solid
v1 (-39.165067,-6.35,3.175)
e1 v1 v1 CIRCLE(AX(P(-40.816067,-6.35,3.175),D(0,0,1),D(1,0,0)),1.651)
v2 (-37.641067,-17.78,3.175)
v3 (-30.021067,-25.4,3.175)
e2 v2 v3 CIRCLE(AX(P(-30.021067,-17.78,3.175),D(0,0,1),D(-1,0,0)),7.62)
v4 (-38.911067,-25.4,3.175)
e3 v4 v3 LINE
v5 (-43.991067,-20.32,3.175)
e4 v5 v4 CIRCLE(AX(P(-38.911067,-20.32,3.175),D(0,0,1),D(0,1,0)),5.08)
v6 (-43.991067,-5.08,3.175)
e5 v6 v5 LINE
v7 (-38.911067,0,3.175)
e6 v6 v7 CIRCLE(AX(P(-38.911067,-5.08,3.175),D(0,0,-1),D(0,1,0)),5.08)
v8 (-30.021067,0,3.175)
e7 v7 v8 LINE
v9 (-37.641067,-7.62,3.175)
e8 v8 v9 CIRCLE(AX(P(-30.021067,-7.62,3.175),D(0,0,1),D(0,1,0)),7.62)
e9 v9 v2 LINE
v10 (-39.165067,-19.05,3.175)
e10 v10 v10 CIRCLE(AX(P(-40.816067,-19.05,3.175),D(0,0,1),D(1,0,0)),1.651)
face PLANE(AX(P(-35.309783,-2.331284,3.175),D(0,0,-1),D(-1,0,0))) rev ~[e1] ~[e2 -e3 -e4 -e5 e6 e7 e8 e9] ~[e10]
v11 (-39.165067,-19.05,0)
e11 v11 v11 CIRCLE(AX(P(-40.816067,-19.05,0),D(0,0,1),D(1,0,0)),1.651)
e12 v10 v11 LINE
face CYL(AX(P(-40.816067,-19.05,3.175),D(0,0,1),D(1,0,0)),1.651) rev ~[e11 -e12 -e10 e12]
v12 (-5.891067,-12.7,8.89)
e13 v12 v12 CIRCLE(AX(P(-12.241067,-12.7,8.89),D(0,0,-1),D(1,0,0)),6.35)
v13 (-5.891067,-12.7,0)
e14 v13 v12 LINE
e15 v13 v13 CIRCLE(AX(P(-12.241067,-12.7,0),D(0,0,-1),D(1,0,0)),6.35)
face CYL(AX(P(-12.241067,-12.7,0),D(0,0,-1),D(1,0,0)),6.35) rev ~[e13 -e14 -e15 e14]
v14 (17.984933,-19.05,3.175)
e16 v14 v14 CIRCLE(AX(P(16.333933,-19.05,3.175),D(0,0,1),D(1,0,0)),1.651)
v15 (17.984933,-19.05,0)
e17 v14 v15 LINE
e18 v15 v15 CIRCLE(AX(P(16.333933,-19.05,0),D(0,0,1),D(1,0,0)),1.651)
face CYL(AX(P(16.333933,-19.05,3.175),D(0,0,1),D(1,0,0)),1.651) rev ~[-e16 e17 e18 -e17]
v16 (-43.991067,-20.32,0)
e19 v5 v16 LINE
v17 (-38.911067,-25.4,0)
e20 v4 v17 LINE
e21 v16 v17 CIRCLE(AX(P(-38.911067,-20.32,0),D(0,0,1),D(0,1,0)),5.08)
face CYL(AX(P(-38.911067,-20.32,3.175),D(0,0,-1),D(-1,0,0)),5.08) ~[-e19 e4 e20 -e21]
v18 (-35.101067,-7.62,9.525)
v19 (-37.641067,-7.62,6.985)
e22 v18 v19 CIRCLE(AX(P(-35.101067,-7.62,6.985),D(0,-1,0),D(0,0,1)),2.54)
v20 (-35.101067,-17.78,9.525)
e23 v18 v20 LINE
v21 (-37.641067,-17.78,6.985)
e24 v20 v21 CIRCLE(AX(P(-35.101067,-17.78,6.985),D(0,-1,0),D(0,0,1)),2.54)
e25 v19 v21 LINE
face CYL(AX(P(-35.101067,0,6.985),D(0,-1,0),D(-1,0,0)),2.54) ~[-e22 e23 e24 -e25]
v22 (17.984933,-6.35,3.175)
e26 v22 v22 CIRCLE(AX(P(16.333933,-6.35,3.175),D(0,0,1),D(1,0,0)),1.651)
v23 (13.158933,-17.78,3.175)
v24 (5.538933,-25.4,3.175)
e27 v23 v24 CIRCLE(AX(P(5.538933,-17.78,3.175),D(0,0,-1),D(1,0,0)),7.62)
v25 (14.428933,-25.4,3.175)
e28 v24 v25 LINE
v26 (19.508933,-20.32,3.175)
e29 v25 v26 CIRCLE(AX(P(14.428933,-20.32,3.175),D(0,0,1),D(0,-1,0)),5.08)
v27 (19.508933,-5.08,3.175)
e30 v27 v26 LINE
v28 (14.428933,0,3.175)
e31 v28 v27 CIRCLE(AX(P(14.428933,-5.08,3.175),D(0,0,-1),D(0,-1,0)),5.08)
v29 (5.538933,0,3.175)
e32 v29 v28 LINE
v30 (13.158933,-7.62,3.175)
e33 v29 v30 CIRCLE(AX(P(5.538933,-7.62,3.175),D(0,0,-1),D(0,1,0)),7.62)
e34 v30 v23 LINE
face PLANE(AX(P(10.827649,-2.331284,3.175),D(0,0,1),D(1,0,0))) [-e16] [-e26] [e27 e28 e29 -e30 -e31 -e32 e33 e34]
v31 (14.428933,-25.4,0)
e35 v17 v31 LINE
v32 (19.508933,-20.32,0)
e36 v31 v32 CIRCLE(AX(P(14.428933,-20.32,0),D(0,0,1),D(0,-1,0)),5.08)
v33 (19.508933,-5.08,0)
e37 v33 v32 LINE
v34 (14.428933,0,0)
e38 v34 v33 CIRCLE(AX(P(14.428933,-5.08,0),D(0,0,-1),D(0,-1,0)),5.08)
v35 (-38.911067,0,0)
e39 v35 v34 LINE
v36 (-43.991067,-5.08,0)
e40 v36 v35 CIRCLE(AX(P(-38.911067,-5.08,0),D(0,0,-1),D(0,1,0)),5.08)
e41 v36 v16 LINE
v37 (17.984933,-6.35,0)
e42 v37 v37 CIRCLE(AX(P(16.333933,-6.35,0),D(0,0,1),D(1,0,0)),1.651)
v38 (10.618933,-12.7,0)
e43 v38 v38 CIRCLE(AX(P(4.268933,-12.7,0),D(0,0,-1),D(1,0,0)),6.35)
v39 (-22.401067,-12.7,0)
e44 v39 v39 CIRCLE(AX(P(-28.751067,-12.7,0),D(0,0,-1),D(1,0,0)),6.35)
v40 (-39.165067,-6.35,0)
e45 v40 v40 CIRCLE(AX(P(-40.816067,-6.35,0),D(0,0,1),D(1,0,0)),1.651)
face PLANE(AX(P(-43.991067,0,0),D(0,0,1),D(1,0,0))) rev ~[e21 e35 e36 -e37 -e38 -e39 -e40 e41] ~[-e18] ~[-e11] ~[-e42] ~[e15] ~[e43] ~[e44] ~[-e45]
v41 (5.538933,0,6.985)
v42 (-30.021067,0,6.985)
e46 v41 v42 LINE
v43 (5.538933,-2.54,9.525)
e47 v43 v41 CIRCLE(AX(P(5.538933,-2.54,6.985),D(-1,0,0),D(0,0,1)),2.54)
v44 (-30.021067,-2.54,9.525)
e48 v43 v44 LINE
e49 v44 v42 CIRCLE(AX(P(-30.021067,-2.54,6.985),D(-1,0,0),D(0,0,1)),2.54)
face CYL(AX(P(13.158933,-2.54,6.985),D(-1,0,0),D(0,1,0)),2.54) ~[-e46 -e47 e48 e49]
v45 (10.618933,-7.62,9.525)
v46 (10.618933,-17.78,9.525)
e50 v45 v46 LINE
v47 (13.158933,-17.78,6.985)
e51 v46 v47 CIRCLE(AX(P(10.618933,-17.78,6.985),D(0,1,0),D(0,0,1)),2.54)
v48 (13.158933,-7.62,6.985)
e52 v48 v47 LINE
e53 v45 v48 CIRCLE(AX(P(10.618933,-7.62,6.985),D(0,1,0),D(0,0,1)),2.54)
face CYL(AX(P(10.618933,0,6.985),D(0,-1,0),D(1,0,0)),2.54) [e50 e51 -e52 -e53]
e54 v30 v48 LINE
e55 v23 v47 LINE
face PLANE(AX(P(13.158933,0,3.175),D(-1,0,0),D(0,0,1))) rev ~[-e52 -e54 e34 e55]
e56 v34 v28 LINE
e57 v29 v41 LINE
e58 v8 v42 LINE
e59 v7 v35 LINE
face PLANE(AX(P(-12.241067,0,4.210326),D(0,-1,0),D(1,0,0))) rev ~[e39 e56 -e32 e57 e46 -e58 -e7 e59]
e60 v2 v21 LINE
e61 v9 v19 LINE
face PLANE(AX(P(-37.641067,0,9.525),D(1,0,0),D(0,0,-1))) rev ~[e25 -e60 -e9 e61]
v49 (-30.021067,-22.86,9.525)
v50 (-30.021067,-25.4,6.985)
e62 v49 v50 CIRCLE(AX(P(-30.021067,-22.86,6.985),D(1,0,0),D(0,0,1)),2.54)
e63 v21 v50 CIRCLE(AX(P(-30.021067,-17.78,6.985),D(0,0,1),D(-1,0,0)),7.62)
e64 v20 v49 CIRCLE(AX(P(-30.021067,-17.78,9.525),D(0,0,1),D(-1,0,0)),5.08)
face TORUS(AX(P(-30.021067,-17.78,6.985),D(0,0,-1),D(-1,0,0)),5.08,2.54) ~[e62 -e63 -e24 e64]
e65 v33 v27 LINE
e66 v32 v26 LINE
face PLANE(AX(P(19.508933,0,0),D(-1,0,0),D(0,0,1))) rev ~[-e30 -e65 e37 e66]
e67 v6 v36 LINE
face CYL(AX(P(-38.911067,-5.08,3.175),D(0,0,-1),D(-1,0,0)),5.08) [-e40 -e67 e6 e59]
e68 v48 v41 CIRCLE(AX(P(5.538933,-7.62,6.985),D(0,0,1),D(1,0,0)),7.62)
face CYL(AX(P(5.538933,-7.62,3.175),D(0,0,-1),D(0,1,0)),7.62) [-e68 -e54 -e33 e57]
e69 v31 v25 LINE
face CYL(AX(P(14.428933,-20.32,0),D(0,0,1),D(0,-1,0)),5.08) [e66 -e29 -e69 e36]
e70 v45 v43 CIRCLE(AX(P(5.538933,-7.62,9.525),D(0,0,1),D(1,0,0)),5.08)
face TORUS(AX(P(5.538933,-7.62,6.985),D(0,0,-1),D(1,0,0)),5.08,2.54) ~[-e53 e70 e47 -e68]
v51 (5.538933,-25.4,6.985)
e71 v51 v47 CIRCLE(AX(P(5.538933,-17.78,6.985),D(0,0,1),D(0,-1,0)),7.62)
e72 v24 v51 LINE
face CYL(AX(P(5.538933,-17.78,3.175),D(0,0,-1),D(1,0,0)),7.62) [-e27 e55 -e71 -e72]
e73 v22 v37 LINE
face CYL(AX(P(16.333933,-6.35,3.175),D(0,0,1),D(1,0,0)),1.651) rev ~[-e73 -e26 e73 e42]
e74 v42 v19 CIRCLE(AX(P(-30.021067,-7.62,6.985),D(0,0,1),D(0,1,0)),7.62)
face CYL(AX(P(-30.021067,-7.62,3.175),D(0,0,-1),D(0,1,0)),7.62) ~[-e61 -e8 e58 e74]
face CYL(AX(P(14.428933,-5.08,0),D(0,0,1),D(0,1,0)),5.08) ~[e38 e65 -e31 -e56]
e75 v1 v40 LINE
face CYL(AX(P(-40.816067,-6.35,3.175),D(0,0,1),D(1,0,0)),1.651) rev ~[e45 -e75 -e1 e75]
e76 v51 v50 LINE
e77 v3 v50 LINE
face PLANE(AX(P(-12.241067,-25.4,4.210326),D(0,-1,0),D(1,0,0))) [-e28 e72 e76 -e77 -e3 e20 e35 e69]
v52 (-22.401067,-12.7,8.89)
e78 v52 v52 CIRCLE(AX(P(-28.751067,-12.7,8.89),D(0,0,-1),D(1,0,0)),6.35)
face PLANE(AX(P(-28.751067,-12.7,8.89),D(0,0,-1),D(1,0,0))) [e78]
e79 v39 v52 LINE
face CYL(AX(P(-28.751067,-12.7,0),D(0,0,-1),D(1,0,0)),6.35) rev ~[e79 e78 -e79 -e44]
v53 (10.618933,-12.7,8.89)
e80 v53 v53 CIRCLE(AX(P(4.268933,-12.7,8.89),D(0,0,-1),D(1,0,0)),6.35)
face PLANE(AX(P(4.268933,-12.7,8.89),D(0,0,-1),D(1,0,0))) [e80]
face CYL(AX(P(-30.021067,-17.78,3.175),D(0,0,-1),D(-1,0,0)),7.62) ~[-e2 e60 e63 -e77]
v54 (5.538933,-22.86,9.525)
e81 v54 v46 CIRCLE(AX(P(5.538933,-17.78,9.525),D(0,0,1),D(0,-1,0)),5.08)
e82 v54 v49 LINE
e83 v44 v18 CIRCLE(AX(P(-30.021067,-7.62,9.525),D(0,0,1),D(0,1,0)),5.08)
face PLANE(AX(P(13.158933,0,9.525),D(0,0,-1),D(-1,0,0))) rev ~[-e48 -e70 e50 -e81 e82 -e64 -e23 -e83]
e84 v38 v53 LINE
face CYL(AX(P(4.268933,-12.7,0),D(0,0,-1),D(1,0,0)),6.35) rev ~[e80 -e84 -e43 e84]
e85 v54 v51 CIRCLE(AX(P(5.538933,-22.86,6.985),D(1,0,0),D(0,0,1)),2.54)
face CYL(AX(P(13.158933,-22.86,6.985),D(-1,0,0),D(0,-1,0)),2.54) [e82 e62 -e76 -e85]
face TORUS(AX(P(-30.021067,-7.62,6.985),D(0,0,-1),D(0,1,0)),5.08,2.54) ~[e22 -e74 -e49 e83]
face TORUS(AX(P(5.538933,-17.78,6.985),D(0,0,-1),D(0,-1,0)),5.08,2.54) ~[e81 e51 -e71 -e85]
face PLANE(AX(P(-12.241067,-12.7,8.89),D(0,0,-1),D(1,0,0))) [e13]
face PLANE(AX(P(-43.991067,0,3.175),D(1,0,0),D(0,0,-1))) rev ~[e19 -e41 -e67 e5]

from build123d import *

# Parameters (mm, degrees)
F1_DEPTH     = 25.4
F3_R         = 1.651
F4_DEPTH     = 3.176
F5_R         = 6.35
F6_DEPTH     = 8.89
F7_R         = 5.08
F8_R         = 2.54
F9_T1_DEPTH  = 6.35
F9_T4_ANGLE  = 90
F9_T6_ANGLE  = 90
F9_T8_ANGLE  = 90
F9_T10_ANGLE = 90


# Not quite as in the source:
# - a fillet or chamfer that OpenCascade refuses, or shapes differently, is made with other operations: its cross-section is extruded or revolved along the edge and cut away or added
# - a feature names something its author has since deleted; it is built from what else it names


with BuildPart() as f1:
    # F0 (on Front) → F1 (new body)
    with BuildSketch(Plane.XZ):
        Polygon((-43.9910670578, 3.175), (-43.9910670578, 0), (19.5089329422, 0), (19.5089329422, 3.175), (13.1589329422, 3.175), (13.1589329422, 9.525), (-37.6410670578, 9.525), (-37.6410670578, 3.175), align=None)
    extrude(amount=F1_DEPTH)

    # F3 (on face) → F4 (cut, through all)
    with BuildSketch(Plane.XY.offset(3.175)):
        with Locations((-40.8160670578, -19.05)):
            Circle(F3_R)
        with Locations((-40.8160670578, -6.35)):
            Circle(F3_R)
        with Locations((16.3339329422, -6.35)):
            Circle(F3_R)
        with Locations((16.3339329422, -19.05)):
            Circle(F3_R)
    extrude(amount=-F4_DEPTH, mode=Mode.SUBTRACT)

    # F5 (on face) → F6 (cut)
    with BuildSketch(Plane(origin=(0, 0, 0), x_dir=(1, 0, 0), z_dir=(0, 0, -1))):
        with Locations((-28.7510670578, 12.7)):
            Circle(F5_R)
        with Locations((4.2689329422, 12.7)):
            Circle(F5_R)
        with Locations((-12.2410670578, 12.7)):
            Circle(F5_R)
    extrude(amount=-F6_DEPTH, mode=Mode.SUBTRACT)

    # F7
    f7_edges = [f1.edges().sort_by_distance(p)[0] for p in [
        (19.508933, -25.4, 1.5875),
        (19.508933, 0, 1.5875),
        (-43.991067, -25.4, 1.5875),
        (-43.991067, 0, 1.5875),
    ]]
    fillet(f7_edges, radius=F7_R)

    # F8
    f8_edges = [f1.edges().sort_by_distance(p)[0] for p in [
        (-12.241067, -25.4, 9.525),
        (-37.641067, -12.7, 9.525),
        (-12.241067, 0, 9.525),
        (13.158933, -12.7, 9.525),
    ]]
    fillet(f8_edges, radius=F8_R)

    # F9: fillet of radius 7.62 on 4 edges, made by hand

    # F9_s2 → F9_t1 (cut)
    with BuildSketch(Plane.XY.offset(3.175)):
        with BuildLine():
            ThreePointArc((-37.6410670578, -17.78), (-35.4092207305, -23.1681536726), (-30.0210670578, -25.4))
            Line((-30.0210670578, -25.4), (-37.6410670578, -25.4))
            Line((-37.6410670578, -25.4), (-37.6410670578, -17.78))
        make_face()
        with BuildLine():
            ThreePointArc((13.1589329422, -17.78), (10.9270866148, -23.1681536726), (5.5389329422, -25.4))
            Line((5.5389329422, -25.4), (13.1589329422, -25.4))
            Line((13.1589329422, -25.4), (13.1589329422, -17.78))
        make_face()
        with BuildLine():
            ThreePointArc((-30.0210670578, 0), (-35.4092207305, -2.2318463274), (-37.6410670578, -7.62))
            Line((-37.6410670578, -7.62), (-37.6410670578, 0))
            Line((-37.6410670578, 0), (-30.0210670578, 0))
        make_face()
        with BuildLine():
            ThreePointArc((5.5389329422, 0), (10.9270866148, -2.2318463274), (13.1589329422, -7.62))
            Line((13.1589329422, -7.62), (13.1589329422, 0))
            Line((13.1589329422, 0), (5.5389329422, 0))
        make_face()
    extrude(amount=F9_T1_DEPTH, mode=Mode.SUBTRACT)

    # F9_s3 → F9_t4 (revolve, cut)
    with BuildSketch(Plane.XZ.offset(7.62)):
        with BuildLine():
            ThreePointArc((10.6189329422, 9.525), (12.4149841664, 8.7810512242), (13.1589329422, 6.985))
            Line((13.1589329422, 6.985), (13.1589329422, 9.525))
            Line((13.1589329422, 9.525), (10.6189329422, 9.525))
        make_face()
    revolve(axis=Axis((5.5389329422, -7.62, 9.525), (0, 0, 1)), revolution_arc=F9_T4_ANGLE, mode=Mode.SUBTRACT)

    # F9_s5 → F9_t6 (revolve, cut)
    with BuildSketch(Plane.YZ.offset(-30.0210670578)):
        with BuildLine():
            ThreePointArc((-2.54, 9.525), (-0.7439487758, 8.7810512242), (0, 6.985))
            Line((0, 6.985), (0, 9.525))
            Line((0, 9.525), (-2.54, 9.525))
        make_face()
    revolve(axis=Axis((-30.0210670578, -7.62, 9.525), (0, 0, 1)), revolution_arc=F9_T6_ANGLE, mode=Mode.SUBTRACT)

    # F9_s7 → F9_t8 (revolve, cut)
    with BuildSketch(Plane.YZ.offset(5.5389329422)):
        with BuildLine():
            ThreePointArc((-22.86, 9.525), (-24.6560512242, 8.7810512242), (-25.4, 6.985))
            Line((-25.4, 6.985), (-25.4, 9.525))
            Line((-25.4, 9.525), (-22.86, 9.525))
        make_face()
    revolve(axis=Axis((5.5389329422, -17.78, 9.525), (0, 0, 1)), revolution_arc=F9_T8_ANGLE, mode=Mode.SUBTRACT)

    # F9_s9 → F9_t10 (revolve, cut)
    with BuildSketch(Plane.XZ.offset(17.78)):
        with BuildLine():
            ThreePointArc((-35.1010670578, 9.525), (-36.8971182821, 8.7810512242), (-37.6410670578, 6.985))
            Line((-37.6410670578, 6.985), (-37.6410670578, 9.525))
            Line((-37.6410670578, 9.525), (-35.1010670578, 9.525))
        make_face()
    revolve(axis=Axis((-30.0210670578, -17.78, 9.525), (0, 0, 1)), revolution_arc=F9_T10_ANGLE, mode=Mode.SUBTRACT)


solid = f1.part
